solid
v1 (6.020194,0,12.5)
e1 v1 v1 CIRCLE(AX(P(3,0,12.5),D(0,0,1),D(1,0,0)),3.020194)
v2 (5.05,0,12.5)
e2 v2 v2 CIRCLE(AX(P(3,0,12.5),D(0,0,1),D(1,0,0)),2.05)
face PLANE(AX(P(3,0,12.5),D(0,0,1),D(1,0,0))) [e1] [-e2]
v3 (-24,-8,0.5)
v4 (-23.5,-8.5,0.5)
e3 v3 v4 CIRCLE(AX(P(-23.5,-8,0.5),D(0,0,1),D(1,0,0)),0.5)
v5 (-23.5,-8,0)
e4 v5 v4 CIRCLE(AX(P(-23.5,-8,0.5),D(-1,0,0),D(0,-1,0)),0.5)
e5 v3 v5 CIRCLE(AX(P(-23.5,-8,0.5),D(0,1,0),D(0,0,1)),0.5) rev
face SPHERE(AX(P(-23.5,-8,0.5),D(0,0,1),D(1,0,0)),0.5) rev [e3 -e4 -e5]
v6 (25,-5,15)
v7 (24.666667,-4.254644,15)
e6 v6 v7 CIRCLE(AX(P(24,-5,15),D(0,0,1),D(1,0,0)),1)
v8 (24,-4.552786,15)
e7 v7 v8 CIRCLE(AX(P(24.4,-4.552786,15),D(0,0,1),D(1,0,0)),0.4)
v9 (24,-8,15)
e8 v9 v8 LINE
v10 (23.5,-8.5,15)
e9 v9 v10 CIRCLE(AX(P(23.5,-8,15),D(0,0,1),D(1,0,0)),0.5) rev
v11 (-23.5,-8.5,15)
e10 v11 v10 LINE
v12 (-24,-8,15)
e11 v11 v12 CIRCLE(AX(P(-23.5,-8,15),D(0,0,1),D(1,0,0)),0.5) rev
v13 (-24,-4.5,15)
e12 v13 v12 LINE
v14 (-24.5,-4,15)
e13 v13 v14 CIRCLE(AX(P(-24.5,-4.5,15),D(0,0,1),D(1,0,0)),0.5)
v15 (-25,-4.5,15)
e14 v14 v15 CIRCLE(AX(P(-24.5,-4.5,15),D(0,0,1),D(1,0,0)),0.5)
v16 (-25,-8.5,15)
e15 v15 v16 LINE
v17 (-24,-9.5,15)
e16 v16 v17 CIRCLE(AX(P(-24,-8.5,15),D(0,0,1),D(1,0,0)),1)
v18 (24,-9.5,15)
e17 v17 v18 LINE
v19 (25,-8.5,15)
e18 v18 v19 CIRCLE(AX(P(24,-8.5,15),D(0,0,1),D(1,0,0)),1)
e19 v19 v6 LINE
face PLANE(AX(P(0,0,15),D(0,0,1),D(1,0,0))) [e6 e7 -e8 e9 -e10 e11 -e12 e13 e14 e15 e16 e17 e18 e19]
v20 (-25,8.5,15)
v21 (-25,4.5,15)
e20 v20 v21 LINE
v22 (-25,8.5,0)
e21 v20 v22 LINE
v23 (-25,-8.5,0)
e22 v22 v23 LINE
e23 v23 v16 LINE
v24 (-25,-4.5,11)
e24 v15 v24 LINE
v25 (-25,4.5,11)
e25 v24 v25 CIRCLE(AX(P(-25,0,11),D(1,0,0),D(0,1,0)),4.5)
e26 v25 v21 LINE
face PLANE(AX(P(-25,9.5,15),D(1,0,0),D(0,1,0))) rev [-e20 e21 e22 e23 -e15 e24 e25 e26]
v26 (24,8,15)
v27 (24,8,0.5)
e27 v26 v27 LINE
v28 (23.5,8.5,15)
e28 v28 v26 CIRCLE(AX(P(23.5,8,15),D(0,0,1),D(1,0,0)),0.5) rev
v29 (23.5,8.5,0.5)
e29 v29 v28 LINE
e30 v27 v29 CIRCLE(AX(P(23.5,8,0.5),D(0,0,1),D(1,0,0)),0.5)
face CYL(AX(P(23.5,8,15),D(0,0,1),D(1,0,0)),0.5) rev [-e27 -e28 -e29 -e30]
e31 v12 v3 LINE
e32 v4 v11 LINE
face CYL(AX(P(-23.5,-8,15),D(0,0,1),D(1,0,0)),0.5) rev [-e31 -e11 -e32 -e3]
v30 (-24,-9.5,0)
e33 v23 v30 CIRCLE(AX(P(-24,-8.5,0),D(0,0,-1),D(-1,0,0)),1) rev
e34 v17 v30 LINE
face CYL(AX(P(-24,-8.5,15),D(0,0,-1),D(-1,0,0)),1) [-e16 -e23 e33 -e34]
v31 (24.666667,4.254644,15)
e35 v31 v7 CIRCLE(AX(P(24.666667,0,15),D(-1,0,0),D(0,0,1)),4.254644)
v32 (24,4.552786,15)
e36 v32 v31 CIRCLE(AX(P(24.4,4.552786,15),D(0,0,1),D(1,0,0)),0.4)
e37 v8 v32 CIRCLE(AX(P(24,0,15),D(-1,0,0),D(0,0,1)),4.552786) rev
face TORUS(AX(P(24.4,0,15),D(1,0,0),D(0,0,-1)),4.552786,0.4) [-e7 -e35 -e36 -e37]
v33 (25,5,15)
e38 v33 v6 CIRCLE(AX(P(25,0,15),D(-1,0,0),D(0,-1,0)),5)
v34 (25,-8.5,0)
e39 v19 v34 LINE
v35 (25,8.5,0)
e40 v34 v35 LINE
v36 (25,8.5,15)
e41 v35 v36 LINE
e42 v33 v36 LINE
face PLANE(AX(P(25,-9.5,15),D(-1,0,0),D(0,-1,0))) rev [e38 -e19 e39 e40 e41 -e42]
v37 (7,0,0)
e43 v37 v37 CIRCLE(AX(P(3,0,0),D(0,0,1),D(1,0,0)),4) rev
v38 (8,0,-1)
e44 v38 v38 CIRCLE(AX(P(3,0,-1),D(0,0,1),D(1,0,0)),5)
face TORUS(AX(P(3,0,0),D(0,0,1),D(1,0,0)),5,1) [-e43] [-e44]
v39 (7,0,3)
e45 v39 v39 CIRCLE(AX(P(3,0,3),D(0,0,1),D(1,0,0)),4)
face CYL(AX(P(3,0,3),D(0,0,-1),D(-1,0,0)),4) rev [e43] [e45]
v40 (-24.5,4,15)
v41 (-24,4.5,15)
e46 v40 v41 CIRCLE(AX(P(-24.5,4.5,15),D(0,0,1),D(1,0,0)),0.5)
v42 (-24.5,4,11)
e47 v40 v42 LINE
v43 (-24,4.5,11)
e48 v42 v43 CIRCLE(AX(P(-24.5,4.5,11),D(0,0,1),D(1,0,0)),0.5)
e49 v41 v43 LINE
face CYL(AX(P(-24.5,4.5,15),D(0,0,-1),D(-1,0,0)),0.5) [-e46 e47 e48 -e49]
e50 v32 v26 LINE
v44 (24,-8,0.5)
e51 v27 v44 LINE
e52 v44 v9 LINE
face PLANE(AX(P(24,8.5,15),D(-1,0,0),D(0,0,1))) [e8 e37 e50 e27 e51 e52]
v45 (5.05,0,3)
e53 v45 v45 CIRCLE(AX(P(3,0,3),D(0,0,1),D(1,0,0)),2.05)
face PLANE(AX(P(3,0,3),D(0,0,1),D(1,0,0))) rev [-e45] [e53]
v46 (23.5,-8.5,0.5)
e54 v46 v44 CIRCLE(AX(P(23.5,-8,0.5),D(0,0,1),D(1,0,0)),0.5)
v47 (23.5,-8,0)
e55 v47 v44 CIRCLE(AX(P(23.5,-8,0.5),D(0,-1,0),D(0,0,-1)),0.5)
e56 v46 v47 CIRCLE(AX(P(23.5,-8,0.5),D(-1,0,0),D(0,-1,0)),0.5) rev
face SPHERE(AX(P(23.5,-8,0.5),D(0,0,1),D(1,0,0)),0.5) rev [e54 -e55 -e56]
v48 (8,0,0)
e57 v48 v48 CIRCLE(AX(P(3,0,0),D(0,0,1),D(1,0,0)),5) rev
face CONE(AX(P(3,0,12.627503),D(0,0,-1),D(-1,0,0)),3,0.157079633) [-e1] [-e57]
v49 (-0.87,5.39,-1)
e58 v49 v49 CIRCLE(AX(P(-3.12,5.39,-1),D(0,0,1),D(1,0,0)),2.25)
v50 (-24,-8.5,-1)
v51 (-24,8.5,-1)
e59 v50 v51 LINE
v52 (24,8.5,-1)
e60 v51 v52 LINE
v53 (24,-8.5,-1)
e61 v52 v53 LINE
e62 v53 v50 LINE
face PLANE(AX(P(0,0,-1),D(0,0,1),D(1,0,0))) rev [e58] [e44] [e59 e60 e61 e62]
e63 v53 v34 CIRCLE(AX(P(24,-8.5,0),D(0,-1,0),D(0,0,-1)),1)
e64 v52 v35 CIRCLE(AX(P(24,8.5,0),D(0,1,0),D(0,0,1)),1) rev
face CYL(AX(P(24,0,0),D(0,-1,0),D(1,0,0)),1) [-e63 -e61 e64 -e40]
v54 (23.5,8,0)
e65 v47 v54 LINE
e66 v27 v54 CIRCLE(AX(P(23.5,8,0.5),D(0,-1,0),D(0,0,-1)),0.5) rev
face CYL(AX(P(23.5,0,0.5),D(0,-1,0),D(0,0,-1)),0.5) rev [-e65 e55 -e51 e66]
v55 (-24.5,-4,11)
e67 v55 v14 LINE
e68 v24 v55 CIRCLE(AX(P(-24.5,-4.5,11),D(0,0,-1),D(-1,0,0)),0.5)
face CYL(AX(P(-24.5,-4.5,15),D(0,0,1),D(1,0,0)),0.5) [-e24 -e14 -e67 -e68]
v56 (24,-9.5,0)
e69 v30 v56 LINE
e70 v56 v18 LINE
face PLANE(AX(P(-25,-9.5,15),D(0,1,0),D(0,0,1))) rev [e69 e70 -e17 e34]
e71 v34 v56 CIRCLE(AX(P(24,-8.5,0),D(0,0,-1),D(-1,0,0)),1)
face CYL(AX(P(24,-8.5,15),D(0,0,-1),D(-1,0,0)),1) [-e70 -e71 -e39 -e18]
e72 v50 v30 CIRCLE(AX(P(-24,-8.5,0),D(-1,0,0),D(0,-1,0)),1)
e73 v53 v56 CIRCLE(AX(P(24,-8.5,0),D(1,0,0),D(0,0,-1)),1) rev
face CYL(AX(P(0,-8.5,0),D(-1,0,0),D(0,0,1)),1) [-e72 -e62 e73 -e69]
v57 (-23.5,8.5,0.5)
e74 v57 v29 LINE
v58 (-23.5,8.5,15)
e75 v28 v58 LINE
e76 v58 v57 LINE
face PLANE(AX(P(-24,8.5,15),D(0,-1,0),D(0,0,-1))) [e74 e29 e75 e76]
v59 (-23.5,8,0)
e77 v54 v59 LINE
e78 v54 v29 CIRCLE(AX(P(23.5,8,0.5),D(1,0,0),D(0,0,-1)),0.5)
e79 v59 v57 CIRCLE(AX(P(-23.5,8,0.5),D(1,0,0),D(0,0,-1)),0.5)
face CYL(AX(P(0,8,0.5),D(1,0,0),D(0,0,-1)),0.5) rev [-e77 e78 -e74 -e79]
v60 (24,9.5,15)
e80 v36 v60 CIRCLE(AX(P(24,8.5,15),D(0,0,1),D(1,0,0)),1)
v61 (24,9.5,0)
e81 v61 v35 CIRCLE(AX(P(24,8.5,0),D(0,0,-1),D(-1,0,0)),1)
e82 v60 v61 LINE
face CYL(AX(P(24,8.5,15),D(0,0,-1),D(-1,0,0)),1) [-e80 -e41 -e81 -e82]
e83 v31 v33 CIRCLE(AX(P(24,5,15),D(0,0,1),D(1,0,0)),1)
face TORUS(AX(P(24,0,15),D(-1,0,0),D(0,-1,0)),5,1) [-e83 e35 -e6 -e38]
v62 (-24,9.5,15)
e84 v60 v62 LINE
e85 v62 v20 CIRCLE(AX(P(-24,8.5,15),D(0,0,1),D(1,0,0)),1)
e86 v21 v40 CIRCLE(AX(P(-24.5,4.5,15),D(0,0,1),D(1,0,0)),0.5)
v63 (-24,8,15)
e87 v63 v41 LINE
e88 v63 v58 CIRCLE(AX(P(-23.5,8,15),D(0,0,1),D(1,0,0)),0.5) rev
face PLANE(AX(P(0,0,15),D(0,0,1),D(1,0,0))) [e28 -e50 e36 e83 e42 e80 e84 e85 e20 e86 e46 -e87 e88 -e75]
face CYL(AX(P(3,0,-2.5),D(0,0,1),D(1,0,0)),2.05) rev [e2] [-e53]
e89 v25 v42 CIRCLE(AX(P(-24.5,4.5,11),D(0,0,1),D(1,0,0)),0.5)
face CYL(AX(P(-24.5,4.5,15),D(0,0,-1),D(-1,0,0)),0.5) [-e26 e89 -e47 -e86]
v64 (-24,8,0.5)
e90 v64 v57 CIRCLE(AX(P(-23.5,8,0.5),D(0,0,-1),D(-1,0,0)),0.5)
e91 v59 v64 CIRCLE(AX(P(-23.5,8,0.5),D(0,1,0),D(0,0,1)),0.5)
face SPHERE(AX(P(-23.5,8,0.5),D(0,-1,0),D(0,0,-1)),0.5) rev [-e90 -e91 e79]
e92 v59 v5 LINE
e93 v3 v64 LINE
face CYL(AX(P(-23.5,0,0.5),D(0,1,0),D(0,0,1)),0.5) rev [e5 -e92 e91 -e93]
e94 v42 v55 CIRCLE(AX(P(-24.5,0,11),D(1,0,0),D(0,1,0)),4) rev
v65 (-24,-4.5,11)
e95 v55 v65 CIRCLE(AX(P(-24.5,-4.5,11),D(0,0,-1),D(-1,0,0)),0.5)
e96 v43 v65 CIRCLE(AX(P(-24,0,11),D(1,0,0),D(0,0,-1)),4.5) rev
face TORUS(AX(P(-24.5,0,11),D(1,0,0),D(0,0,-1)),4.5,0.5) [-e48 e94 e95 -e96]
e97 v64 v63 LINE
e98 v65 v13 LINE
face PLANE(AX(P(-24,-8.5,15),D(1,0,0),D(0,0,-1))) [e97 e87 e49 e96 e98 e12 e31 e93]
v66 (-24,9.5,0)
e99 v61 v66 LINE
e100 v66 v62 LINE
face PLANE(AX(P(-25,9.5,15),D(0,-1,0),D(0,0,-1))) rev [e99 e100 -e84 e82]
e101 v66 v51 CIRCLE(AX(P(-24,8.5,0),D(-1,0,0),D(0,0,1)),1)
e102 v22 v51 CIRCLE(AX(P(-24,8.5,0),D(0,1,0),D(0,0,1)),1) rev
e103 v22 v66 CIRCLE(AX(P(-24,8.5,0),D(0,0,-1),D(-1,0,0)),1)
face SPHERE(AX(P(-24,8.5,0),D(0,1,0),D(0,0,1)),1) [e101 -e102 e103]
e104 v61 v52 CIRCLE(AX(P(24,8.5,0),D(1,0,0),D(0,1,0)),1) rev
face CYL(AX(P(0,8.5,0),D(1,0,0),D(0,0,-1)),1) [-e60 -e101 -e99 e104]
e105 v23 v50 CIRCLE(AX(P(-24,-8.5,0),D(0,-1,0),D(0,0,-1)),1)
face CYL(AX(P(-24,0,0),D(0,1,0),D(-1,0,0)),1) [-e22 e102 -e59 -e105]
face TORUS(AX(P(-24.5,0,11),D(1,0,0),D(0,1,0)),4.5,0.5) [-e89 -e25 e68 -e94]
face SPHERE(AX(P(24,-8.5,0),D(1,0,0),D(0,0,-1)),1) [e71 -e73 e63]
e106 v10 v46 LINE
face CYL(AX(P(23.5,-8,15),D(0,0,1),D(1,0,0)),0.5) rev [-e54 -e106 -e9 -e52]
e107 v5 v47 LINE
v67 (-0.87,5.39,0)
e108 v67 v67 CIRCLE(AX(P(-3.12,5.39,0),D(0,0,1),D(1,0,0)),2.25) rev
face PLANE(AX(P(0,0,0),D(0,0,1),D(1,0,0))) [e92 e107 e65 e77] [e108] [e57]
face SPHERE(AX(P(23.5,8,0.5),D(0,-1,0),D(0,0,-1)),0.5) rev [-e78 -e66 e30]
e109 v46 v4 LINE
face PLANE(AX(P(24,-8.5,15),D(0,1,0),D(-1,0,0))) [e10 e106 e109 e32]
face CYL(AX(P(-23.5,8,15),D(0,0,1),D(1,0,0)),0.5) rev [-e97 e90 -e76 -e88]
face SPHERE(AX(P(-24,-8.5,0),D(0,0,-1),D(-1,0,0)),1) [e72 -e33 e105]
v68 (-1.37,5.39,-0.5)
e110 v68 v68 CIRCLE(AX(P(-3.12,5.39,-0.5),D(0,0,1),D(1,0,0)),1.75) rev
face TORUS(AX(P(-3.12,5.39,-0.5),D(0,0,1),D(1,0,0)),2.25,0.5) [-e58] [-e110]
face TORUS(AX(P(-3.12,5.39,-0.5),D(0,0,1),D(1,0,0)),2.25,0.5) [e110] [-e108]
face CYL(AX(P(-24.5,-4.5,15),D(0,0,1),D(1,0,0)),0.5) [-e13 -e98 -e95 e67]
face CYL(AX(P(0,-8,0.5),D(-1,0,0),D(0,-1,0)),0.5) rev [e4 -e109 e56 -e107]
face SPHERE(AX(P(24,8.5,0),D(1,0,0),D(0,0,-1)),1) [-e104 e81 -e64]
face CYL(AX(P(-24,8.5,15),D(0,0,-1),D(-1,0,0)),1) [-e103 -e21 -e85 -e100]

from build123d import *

# Parameters (mm, degrees)
ESBO_O1_W                  = 50
ESBO_O1_H                  = 19
ESBO_O1_W_2                = 48
ESBO_O1_H_2                = 17
RESSALTO_EXTRUS_O1_DEPTH   = 15
ESBO_O2_W                  = 50
ESBO_O2_H                  = 19
RESSALTO_EXTRUS_O2_DEPTH   = 1
ESBO_O3_R                  = 3
RESSALTO_EXTRUS_O3_DEPTH   = 12.5
CHANFRO1_SIZE              = 2
CHANFRO1_SIZE_2            = 12.627503029
ESBO_O4_R                  = 4
CORTE_EXTRUS_O1_DEPTH      = 4
FILETE2_R                  = 1
CORTE_EXTRUS_O2_DEPTH      = 54.058929503
CORTE_EXTRUS_O2_DEPTH_BACK = 3
CORTE_EXTRUS_O3_DEPTH      = 3
FILETE4_R                  = 1
ESBO_O7_R                  = 2.05
CORTE_EXTRUS_O4_DEPTH      = 15
FILETE5_R                  = 1
ESBO_O8_R                  = 1.75
CORTE_EXTRUS_O5_DEPTH      = 3
FILETE6_R                  = 0.5
FILETE10_R                 = 0.5
FILETE11_R                 = 0.5
FILETE14_R                 = 0.4
FILETE17_R                 = 0.5


# Some blends are built 0.0001 mm under size
with BuildPart() as part:
    # Esboço1 → Ressalto-extrusão1 (new body)
    with BuildSketch(Plane.XY):
        Rectangle(ESBO_O1_W, ESBO_O1_H)
        Rectangle(ESBO_O1_W_2, ESBO_O1_H_2, mode=Mode.SUBTRACT)
    extrude(amount=RESSALTO_EXTRUS_O1_DEPTH)

    # Esboço2 → Ressalto-extrusão2 (add)
    with BuildSketch(Plane(origin=(0, 0, 0), x_dir=(-1, 0, 0), z_dir=(0, 0, -1))):
        Rectangle(ESBO_O2_W, ESBO_O2_H)
    extrude(amount=RESSALTO_EXTRUS_O2_DEPTH)

    # Esboço3 → Ressalto-extrusão3 (add)
    with BuildSketch(Plane.XY):
        with Locations((3, 0)):
            Circle(ESBO_O3_R)
    extrude(amount=RESSALTO_EXTRUS_O3_DEPTH)

    # Chanfro1
    # the kernel refuses this chamfer: 12.627503029, 2 mm, written as the material it adds along each edge
    with BuildSketch(Plane(origin=(3, 0, 0), x_dir=(1, 0, 0), z_dir=(0, -1, 0))) as chanfro1_piece_1_section:
        Polygon((3 + CHANFRO1_SIZE, 0), (3, CHANFRO1_SIZE_2), (3, 0), align=None)
    chanfro1_piece_1 = revolve(axis=Axis((3, 0, 0), (0, 0, 1)), mode=Mode.PRIVATE)
    chanfro1_piece_1 = split(chanfro1_piece_1, bisect_by=Plane(origin=(-0.978781541, 0, 12.5), z_dir=(0, 0, -1)), keep=Keep.TOP, mode=Mode.PRIVATE)
    add(chanfro1_piece_1)

    # Esboço4 → Corte-extrusão1 (cut)
    with BuildSketch(Plane.XY.offset(-1)):
        with Locations((3, 0)):
            Circle(ESBO_O4_R)
    extrude(amount=CORTE_EXTRUS_O1_DEPTH, mode=Mode.SUBTRACT)

    # Filete2
    filete2_edges = [part.edges().sort_by_distance(p)[0] for p in [
        (25, 0, -1),
        (0, -9.5, -1),
        (-25, 0, -1),
        (0, 9.5, -1),
        (-25, 9.5, 7),
        (25, 9.5, 7),
        (25, -9.5, 7),
        (-25, -9.5, 7),
    ]]
    fillet(filete2_edges, radius=FILETE2_R)

    # Esboço5 → Corte-extrusão2 (cut, two sides: drawn at the far end of the back side and taken through both)
    with BuildSketch(Plane.ZY.offset(25).offset(-CORTE_EXTRUS_O2_DEPTH_BACK)):
        with BuildLine():
            Line((66.868842831, 4), (15, 4))
            Line((15, 4), (11, 4))
            ThreePointArc((11, 4), (7, 0), (11, -4))
            Line((11, -4), (15, -4))
            Line((15, -4), (66.868842831, -4))
            Line((66.868842831, -4), (170.606528493, -4))
            Line((170.606528493, -4), (170.606528493, 4))
            Line((170.606528493, 4), (66.868842831, 4))
        make_face()
    extrude(amount=CORTE_EXTRUS_O2_DEPTH + CORTE_EXTRUS_O2_DEPTH_BACK, mode=Mode.SUBTRACT)

    # Esboço6 → Corte-extrusão3 (cut)
    with BuildSketch(Plane(origin=(25, 0, 0), x_dir=(0, 0, -1), z_dir=(1, 0, 0))):
        with BuildLine():
            Line((-15, 4), (-15, -4))
            ThreePointArc((-15, -4), (-11, 0), (-15, 4))
        make_face()
    extrude(amount=-CORTE_EXTRUS_O3_DEPTH, mode=Mode.SUBTRACT)

    # Filete4
    filete4_edges = [part.edges().sort_by_distance(p)[0] for p in [
        (25, 0, 11),
    ]]
    fillet(filete4_edges, radius=FILETE4_R - 0.0001)  # a hair under: the kernel refuses the full size

    # Esboço7 → Corte-extrusão4 (cut)
    with BuildSketch(Plane.XY.offset(12.5)):
        with Locations((3, 0)):
            Circle(ESBO_O7_R)
    extrude(amount=-CORTE_EXTRUS_O4_DEPTH, mode=Mode.SUBTRACT)

    # Filete5
    filete5_edges = [part.edges().sort_by_distance(p)[0] for p in [
        (-1, 0, -1),
    ]]
    fillet(filete5_edges, radius=FILETE5_R)

    # Esboço8 → Corte-extrusão5 (cut)
    with BuildSketch(Plane(origin=(0, 0, -1), x_dir=(-1, 0, 0), z_dir=(0, 0, -1))):
        with Locations((3.12, 5.39)):
            Circle(ESBO_O8_R)
    extrude(amount=-CORTE_EXTRUS_O5_DEPTH, mode=Mode.SUBTRACT)

    # Filete6
    filete6_edges = [part.edges().sort_by_distance(p)[0] for p in [
        (-1.37, 5.39, 0),
        (-1.37, 5.39, -1),
    ]]
    fillet(filete6_edges, radius=FILETE6_R - 0.0001)  # a hair under: the kernel refuses the full size

    # Filete10
    filete10_edges = [part.edges().sort_by_distance(p)[0] for p in [
        (-24, 0, 0),
        (0, -8.5, 0),
        (24, 0, 0),
    ]]
    fillet(filete10_edges, radius=FILETE10_R)

    # Filete11
    # the kernel refuses this fillet: 0.5 mm, written as the material it adds along each edge
    with BuildSketch(Plane(origin=(-23.5, -8, 0.5), x_dir=(0, -1, 0), z_dir=(-1, 0, 0))) as filete11_piece_1_section:
        Polygon((0, 0), (FILETE11_R, 0), (FILETE11_R, -FILETE11_R), (0, -FILETE11_R), align=None)
    filete11_piece_1 = extrude(amount=FILETE11_R, mode=Mode.PRIVATE)
    filete11_piece_1 = filete11_piece_1 - Plane(origin=(-23.5, -8, 0.5), x_dir=(0, 0.7071067811865475, 0.7071067811865475), z_dir=(-1, 0, 0)) * Sphere(FILETE11_R, mode=Mode.PRIVATE)
    add(filete11_piece_1)
    with BuildSketch(Plane(origin=(23.5, -8, 0.5), x_dir=(0, -1, 0), z_dir=(1, 0, 0))) as filete11_piece_2_section:
        Polygon((0, 0), (FILETE11_R, 0), (FILETE11_R, FILETE11_R), (0, FILETE11_R), align=None)
    filete11_piece_2 = extrude(amount=FILETE11_R, mode=Mode.PRIVATE)
    filete11_piece_2 = filete11_piece_2 - Plane(origin=(23.5, -8, 0.5), x_dir=(0, 0.7071067811865475, 0.7071067811865475), z_dir=(1, 0, 0)) * Sphere(FILETE11_R, mode=Mode.PRIVATE)
    add(filete11_piece_2)
    with BuildSketch(Plane(origin=(-23.5, 8.5, 0), x_dir=(0, -1, 0), z_dir=(1, 0, 0))) as filete11_piece_3:
        with BuildLine():
            CenterArc((FILETE11_R, -FILETE11_R), FILETE11_R, 90, 90)
            Line((0, -FILETE11_R), (0, 0))
            Line((0, 0), (FILETE11_R, 0))
        make_face()
    extrude(amount=47)
    with BuildSketch(Plane(origin=(-23.5, 8.5, 0.5), x_dir=(0, 0, -1), z_dir=(1, 0, 0))) as filete11_piece_4:
        with BuildLine():
            CenterArc((0.5 - FILETE11_R, -FILETE11_R), FILETE11_R, 0, 90)
            Line((0.5, -FILETE11_R), (0.5, 0))
            Line((0.5, 0), (0.5 - FILETE11_R, 0))
        make_face()
    revolve(axis=Axis((-23.5, 8.5, 0.5), (0, 1, 0)), revolution_arc=90)
    with BuildSketch(Plane(origin=(23.5, 8.5, 0.5), x_dir=(0, 0, -1), z_dir=(-1, 0, 0))) as filete11_piece_5:
        with BuildLine():
            CenterArc((0.5 - FILETE11_R, FILETE11_R), FILETE11_R, 270, 90)
            Line((0.5, FILETE11_R), (0.5, 0))
            Line((0.5, 0), (0.5 - FILETE11_R, 0))
        make_face()
    revolve(axis=Axis((23.5, 8.5, 0.5), (0, -1, 0)), revolution_arc=90)
    with BuildSketch(Plane(origin=(-24, 8.5, 0.5), x_dir=(1, 0, 0), z_dir=(0, 0, 1)), Plane(origin=(-24, -8.5, 0.5), x_dir=(0, 1, 0), z_dir=(0, 0, 1))) as filete11_piece_6:
        with BuildLine():
            CenterArc((FILETE11_R, -FILETE11_R), FILETE11_R, 90, 90)
            Line((0, -FILETE11_R), (0, 0))
            Line((0, 0), (FILETE11_R, 0))
        make_face()
    extrude(amount=14.5)
    with BuildSketch(Plane(origin=(24, -8.5, 0.5), x_dir=(0, 1, 0), z_dir=(0, 0, 1)), Plane(origin=(24, 8.5, 0.5), x_dir=(-1, 0, 0), z_dir=(0, 0, 1))) as filete11_piece_7:
        with BuildLine():
            CenterArc((FILETE11_R, FILETE11_R), FILETE11_R, 180, 90)
            Line((0, FILETE11_R), (0, 0))
            Line((0, 0), (FILETE11_R, 0))
        make_face()
    extrude(amount=14.5)

    # Filete14
    filete14_edges = [part.edges().sort_by_distance(p)[0] for p in [
        (24, 0, 11),
    ]]
    fillet(filete14_edges, radius=FILETE14_R)

    # Filete17
    filete17_edges = [part.edges().sort_by_distance(p)[0] for p in [
        (-24, 4, 13),
        (-24, -4, 13),
        (-25, -4, 13),
        (-25, 4, 13),
        (-24, 0, 7),
        (-25, 0, 7),
    ]]
    fillet(filete17_edges, radius=FILETE17_R - 0.0001)  # a hair under: the kernel refuses the full size


solid = part.part
